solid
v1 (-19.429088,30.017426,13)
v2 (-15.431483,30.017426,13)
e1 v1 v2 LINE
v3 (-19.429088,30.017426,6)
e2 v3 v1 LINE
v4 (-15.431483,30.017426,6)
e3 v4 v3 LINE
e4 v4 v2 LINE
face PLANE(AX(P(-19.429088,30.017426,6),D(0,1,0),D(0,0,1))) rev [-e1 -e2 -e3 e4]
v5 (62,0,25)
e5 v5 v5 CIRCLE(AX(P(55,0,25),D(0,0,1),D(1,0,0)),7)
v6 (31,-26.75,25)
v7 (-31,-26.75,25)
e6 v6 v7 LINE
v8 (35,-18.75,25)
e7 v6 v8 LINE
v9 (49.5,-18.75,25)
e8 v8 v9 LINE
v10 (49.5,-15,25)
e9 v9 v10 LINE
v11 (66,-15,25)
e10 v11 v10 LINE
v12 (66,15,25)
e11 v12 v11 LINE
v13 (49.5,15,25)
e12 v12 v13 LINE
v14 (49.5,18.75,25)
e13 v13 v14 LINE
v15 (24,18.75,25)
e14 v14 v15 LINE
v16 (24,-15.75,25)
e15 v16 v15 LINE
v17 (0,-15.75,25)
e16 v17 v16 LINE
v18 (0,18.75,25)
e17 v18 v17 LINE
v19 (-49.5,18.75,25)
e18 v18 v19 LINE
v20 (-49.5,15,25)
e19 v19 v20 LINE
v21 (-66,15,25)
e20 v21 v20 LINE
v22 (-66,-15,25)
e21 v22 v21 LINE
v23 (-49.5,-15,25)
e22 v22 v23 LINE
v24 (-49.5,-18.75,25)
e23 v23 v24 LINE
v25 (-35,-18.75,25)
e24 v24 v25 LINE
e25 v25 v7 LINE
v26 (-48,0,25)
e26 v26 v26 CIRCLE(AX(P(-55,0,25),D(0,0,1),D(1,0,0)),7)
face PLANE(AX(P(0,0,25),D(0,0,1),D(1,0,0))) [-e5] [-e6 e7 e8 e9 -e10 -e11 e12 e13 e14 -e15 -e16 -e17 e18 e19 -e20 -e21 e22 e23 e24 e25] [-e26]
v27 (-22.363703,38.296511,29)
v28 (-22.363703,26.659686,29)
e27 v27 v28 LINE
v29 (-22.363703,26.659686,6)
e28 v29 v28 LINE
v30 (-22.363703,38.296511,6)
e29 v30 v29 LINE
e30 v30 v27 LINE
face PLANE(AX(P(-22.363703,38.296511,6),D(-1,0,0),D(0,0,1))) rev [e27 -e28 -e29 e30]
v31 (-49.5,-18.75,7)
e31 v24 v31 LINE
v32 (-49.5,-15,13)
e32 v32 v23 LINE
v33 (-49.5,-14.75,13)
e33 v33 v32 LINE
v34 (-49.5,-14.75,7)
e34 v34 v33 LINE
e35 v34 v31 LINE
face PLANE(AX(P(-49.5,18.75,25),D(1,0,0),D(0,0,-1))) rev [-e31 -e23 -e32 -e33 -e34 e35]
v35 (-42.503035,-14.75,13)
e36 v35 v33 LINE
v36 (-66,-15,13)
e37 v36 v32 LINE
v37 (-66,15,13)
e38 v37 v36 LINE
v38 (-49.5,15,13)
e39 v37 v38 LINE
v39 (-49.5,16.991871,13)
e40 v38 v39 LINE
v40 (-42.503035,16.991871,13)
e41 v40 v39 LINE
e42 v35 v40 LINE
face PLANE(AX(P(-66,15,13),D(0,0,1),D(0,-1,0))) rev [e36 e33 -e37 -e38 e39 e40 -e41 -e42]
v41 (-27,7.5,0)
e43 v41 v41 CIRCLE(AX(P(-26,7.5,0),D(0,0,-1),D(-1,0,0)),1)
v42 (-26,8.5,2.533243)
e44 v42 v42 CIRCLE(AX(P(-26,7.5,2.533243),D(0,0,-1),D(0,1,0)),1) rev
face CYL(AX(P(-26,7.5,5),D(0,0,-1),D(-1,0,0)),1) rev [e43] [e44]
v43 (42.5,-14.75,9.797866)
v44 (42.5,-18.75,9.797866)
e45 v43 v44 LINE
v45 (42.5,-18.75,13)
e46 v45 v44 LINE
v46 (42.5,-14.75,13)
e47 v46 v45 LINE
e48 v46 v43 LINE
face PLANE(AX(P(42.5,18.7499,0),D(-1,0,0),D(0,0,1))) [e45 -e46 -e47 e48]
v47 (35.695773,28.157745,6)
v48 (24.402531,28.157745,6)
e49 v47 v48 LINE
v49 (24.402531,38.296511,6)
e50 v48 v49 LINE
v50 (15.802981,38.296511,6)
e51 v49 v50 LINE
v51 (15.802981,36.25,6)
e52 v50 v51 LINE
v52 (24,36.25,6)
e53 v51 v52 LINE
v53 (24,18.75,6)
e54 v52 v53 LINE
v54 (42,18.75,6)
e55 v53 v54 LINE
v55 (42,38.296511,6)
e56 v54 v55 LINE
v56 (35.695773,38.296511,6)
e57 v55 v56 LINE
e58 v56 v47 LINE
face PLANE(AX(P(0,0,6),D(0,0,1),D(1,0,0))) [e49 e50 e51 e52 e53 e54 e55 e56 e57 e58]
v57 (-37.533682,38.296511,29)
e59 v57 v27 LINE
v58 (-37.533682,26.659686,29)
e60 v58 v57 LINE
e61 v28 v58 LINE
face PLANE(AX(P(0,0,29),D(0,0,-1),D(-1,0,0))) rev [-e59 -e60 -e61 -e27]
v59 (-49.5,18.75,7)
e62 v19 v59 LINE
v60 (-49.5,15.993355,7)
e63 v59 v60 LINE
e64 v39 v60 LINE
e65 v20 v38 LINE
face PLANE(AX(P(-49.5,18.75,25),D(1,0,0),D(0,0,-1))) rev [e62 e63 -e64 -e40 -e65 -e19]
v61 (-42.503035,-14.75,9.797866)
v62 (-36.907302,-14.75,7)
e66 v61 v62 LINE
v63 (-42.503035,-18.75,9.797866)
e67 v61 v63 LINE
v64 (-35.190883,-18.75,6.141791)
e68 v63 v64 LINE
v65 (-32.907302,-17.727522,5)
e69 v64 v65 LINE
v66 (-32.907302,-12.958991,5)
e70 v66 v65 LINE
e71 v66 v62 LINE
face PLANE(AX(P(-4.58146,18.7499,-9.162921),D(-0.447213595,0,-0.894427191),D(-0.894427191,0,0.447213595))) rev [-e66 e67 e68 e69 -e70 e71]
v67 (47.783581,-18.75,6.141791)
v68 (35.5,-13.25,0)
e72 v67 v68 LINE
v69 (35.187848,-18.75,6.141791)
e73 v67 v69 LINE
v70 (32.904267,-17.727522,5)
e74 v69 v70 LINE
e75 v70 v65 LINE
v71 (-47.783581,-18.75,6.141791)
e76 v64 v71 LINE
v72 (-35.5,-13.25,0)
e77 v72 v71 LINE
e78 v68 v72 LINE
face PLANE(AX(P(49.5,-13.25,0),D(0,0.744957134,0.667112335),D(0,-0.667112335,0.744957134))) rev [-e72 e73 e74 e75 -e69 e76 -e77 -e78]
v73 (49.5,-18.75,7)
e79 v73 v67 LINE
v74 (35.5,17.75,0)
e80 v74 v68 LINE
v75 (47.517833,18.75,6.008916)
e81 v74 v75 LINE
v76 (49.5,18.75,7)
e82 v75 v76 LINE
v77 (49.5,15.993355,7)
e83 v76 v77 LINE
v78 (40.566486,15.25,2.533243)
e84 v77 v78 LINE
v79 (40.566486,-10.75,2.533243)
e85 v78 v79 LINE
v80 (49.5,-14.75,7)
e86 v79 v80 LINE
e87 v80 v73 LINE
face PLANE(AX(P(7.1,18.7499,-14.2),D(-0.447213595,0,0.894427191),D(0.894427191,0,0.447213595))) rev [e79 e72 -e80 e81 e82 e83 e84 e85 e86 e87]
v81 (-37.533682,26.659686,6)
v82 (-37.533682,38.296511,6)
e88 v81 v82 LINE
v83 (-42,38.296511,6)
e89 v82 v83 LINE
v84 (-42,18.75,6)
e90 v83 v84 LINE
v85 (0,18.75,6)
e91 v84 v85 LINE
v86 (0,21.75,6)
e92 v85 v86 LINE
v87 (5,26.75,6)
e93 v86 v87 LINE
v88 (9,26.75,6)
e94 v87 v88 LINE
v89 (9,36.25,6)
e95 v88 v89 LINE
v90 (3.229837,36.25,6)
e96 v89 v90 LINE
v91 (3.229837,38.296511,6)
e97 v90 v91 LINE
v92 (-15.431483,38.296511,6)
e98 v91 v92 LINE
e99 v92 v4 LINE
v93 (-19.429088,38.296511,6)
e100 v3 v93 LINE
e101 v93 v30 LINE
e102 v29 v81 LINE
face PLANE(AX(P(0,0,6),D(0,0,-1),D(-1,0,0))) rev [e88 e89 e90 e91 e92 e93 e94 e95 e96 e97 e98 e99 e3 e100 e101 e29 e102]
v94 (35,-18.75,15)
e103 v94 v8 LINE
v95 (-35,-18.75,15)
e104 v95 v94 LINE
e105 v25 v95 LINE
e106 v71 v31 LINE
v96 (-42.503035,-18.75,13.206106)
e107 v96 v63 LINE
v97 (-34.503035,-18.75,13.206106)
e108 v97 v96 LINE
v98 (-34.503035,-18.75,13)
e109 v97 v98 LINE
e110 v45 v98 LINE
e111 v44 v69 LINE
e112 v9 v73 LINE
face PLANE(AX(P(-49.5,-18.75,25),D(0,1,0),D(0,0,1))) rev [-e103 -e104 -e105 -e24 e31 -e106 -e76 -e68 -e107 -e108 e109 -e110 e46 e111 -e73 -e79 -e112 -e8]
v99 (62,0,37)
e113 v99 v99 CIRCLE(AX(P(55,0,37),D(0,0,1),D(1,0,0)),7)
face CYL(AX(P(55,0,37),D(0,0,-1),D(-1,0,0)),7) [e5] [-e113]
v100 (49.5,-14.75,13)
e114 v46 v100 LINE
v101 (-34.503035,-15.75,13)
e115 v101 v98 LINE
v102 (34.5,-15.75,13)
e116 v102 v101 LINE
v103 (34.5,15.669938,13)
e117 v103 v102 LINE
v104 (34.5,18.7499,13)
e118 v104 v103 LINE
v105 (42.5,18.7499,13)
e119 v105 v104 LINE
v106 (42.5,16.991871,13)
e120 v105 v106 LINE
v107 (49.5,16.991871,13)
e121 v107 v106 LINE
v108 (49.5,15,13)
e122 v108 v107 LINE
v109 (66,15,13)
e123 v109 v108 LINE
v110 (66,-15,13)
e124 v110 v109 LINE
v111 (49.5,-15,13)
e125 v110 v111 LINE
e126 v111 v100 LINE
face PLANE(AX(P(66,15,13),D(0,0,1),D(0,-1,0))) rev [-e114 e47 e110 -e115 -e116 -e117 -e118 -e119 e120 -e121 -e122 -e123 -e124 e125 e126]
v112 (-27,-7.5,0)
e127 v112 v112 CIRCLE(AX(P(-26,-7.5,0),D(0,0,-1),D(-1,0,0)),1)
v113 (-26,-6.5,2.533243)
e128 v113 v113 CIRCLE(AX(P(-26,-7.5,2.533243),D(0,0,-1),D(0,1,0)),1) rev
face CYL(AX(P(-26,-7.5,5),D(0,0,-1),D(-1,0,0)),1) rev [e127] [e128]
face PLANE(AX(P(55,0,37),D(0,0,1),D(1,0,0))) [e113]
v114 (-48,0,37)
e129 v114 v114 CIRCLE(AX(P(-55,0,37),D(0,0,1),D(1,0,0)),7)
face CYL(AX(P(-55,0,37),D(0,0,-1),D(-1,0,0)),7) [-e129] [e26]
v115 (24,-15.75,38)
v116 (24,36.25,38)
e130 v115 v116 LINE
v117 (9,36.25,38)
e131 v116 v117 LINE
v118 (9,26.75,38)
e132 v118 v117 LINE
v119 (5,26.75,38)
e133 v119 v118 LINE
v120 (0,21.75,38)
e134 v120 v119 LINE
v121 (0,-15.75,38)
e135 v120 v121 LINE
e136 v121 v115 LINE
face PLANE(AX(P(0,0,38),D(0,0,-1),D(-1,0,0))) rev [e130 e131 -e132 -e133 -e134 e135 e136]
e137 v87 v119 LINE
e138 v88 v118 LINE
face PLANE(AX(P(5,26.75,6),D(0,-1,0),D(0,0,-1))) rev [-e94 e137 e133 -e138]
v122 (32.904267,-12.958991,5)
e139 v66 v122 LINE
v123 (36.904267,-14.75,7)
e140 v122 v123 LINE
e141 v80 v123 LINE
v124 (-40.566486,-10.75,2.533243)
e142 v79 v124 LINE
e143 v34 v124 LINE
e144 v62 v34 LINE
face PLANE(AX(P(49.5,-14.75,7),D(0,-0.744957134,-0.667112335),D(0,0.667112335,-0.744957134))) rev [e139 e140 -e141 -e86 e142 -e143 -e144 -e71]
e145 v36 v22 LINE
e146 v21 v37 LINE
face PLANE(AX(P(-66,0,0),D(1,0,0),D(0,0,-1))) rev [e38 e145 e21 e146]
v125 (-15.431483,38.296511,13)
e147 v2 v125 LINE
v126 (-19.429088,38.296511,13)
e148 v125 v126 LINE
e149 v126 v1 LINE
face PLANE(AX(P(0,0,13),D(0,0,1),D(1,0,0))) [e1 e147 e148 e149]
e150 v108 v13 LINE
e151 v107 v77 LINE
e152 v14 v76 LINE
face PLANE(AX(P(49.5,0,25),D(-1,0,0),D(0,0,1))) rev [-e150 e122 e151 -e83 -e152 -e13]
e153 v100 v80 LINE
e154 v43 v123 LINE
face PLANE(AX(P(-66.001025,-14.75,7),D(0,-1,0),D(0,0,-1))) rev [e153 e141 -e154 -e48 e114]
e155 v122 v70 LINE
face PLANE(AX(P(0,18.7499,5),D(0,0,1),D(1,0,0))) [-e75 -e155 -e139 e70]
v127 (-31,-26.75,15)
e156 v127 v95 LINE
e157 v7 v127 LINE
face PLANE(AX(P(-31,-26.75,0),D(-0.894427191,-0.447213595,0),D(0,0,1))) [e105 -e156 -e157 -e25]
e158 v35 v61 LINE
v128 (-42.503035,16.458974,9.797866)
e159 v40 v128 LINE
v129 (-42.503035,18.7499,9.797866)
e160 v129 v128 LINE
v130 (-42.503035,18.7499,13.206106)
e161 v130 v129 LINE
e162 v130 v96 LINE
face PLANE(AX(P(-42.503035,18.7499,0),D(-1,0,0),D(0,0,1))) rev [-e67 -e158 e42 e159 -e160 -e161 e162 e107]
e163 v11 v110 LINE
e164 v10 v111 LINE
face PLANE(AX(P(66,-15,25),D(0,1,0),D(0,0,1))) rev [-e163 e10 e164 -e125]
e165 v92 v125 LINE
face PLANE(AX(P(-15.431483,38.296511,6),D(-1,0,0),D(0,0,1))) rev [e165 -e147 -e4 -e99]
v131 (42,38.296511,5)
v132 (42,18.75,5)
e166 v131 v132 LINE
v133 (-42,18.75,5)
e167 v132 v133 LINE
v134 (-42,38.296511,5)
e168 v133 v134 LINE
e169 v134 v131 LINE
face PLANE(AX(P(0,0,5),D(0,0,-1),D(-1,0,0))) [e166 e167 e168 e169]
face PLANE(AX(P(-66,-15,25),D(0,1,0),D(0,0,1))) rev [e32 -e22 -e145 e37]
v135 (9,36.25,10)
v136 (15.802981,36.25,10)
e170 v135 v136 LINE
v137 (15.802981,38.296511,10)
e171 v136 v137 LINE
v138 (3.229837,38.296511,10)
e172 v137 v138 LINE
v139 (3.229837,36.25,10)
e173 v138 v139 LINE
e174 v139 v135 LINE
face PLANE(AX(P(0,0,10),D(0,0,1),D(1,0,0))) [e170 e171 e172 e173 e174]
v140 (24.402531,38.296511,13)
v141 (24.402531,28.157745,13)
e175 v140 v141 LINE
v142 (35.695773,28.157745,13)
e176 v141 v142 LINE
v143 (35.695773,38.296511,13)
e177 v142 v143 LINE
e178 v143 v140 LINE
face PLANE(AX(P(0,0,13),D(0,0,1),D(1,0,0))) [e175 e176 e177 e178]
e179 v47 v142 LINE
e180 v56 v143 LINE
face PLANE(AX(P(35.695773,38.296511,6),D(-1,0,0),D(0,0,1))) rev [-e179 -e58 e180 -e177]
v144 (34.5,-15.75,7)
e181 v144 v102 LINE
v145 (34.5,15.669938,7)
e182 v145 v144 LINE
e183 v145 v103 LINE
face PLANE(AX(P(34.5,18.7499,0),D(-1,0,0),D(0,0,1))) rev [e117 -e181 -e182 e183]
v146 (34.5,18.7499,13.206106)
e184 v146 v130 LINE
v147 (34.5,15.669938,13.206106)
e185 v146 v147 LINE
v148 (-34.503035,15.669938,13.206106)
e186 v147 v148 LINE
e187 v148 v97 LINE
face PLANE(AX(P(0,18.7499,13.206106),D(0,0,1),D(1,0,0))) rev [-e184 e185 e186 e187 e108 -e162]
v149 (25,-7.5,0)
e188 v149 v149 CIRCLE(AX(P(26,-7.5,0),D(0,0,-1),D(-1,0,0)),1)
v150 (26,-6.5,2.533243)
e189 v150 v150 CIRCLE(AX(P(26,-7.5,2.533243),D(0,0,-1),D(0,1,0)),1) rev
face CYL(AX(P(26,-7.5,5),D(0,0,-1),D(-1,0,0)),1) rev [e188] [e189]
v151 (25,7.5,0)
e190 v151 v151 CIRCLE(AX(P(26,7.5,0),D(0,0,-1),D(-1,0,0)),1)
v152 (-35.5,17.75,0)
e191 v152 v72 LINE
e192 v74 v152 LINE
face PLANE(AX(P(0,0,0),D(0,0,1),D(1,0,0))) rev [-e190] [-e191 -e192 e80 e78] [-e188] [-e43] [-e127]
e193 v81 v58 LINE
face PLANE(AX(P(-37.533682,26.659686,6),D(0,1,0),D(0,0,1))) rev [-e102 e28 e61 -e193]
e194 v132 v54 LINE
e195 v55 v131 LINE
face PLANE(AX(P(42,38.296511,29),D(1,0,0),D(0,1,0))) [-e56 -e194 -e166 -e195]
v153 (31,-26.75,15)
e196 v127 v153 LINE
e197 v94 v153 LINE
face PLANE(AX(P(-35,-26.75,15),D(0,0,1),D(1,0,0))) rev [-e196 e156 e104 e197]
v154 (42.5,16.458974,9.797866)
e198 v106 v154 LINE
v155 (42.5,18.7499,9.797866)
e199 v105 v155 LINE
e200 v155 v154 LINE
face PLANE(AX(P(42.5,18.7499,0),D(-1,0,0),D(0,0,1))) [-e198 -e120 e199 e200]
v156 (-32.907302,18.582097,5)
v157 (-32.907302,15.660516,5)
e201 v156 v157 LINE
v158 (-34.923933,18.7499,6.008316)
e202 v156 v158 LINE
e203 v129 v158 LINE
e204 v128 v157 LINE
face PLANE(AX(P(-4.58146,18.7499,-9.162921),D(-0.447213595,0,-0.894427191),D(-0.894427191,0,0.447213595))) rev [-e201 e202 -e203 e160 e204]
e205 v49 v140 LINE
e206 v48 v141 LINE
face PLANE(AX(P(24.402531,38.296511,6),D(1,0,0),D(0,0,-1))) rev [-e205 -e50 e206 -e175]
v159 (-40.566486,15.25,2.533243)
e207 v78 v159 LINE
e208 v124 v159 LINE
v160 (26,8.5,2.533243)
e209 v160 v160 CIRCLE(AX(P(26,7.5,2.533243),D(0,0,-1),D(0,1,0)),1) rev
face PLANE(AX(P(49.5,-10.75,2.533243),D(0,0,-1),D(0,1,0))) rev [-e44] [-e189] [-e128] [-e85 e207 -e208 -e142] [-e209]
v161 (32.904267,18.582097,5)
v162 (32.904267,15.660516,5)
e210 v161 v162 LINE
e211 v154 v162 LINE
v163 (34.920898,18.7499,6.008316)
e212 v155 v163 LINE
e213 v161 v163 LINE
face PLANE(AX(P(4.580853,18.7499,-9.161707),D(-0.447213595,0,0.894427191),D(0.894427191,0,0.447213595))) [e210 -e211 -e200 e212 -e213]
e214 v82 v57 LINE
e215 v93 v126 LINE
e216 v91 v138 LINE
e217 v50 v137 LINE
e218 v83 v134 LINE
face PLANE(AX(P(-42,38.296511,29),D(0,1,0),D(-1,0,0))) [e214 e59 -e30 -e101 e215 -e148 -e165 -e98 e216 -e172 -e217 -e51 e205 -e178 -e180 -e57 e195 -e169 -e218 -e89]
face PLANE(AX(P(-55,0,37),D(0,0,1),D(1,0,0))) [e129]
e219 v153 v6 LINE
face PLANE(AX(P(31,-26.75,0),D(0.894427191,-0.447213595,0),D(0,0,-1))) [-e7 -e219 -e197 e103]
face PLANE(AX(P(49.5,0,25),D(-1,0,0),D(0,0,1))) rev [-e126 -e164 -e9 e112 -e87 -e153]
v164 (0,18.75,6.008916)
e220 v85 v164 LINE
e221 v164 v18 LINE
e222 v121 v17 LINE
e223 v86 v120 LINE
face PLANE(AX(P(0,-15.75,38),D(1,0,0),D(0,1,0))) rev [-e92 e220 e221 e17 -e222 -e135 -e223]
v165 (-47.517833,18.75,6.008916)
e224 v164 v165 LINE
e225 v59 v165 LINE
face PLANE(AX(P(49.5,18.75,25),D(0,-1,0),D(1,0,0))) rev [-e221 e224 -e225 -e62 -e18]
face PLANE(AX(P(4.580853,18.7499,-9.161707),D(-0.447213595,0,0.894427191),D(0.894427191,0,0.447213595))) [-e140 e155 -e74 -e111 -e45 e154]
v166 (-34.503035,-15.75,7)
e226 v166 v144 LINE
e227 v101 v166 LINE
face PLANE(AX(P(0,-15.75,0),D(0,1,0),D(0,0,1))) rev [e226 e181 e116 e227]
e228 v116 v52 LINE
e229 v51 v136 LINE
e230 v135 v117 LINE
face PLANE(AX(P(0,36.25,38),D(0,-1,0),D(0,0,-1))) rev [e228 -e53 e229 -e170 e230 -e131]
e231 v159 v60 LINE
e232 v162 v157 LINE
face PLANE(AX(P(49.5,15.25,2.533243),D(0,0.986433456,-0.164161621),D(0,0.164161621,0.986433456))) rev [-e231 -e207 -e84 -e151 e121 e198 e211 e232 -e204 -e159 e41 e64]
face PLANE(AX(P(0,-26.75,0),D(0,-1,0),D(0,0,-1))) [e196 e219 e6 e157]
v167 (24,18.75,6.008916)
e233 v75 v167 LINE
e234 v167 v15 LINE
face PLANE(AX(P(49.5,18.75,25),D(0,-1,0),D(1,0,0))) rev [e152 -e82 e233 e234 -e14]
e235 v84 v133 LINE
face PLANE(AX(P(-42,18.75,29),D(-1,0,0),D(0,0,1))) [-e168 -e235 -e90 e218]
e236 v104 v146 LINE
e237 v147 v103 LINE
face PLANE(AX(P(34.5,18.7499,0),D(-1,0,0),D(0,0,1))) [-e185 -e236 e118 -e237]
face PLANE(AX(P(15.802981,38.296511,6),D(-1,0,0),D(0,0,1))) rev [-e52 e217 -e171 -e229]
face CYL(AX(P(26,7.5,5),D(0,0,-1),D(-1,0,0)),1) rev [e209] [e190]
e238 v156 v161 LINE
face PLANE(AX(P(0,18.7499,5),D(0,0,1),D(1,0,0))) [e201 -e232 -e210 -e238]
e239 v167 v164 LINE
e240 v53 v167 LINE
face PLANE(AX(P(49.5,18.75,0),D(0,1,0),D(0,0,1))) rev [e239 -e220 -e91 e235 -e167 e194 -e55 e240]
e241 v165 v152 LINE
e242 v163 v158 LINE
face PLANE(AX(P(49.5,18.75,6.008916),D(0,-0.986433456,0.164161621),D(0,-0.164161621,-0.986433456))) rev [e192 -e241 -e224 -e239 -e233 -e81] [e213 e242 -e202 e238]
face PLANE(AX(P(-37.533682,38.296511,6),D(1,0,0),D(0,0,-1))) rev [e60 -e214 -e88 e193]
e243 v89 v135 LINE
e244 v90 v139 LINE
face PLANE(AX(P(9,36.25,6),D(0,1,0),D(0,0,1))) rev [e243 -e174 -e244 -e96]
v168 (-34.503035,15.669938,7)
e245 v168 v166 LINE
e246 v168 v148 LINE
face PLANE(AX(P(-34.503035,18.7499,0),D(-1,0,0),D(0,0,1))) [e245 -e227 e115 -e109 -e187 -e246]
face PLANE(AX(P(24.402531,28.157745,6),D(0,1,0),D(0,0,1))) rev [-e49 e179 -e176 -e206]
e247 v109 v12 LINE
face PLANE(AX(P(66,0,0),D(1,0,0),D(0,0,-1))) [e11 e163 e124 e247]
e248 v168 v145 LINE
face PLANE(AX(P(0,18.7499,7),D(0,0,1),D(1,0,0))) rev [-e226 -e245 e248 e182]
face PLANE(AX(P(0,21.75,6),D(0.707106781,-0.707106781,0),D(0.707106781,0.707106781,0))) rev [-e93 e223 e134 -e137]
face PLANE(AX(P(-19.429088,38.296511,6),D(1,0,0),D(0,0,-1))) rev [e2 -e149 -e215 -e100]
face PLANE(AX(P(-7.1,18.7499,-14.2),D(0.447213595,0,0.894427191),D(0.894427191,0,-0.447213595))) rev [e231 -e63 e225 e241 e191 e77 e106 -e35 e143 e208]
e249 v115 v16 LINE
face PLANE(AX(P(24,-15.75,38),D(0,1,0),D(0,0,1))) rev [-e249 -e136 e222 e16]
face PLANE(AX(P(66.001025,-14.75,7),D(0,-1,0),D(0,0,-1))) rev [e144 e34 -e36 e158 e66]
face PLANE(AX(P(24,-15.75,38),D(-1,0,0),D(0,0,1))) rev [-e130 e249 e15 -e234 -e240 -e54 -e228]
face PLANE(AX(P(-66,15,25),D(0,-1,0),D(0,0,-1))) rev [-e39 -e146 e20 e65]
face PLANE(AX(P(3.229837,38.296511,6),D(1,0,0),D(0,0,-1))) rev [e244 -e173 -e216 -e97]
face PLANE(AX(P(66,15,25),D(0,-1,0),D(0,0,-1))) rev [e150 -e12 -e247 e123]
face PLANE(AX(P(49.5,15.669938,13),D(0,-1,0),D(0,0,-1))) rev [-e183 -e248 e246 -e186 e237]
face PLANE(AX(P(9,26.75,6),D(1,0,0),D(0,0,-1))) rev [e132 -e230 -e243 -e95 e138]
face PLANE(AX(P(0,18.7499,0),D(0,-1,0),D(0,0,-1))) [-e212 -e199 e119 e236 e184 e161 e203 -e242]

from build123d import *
from OCP.BRepFilletAPI import BRepFilletAPI_MakeChamfer

# Parameters (mm, degrees)
BOSS_EXTRUDE1_DEPTH = 25
SKETCH2_W           = 84
SKETCH2_H           = 19.546511152
BOSS_EXTRUDE2_DEPTH = 24
SKETCH3_W           = 12
SKETCH3_H           = 30
BOSS_EXTRUDE3_DEPTH = 16.5
SKETCH4_W           = 12
SKETCH4_H           = 30
BOSS_EXTRUDE4_DEPTH = 16.5
SKETCH5_W           = 24
SKETCH5_H           = 52
BOSS_EXTRUDE5_DEPTH = 13
SKETCH9_W           = 70
SKETCH9_H           = 10
BOSS_EXTRUDE6_DEPTH = 8
CHAMFER1_SIZE       = 8
CHAMFER1_SIZE_2     = 4
SKETCH10_R          = 7
BOSS_EXTRUDE7_DEPTH = 12
SKETCH11_R          = 1
CUT_EXTRUDE1_DEPTH  = 5
CUT_EXTRUDE24_DEPTH = 37.4999
CUT_EXTRUDE25_REACH = 90.714
CUT_EXTRUDE26_DEPTH = 99
CUT_EXTRUDE27_REACH = 129.479
CUT_EXTRUDE28_DEPTH = 69.00303493
CUT_EXTRUDE29_REACH = 129.479
SKETCH19_W          = 69.00303493
SKETCH19_H          = 6
CUT_EXTRUDE30_DEPTH = 3
CUT_EXTRUDE32_DEPTH = 23
SKETCH21_W          = 3.997604332
SKETCH21_H          = 8.279085248
SKETCH21_W_2        = 11.293242608
SKETCH21_H_2        = 10.138766403
CUT_EXTRUDE33_DEPTH = 16
SKETCH22_W          = 12.573143588
SKETCH22_H          = 2.046511152
CUT_EXTRUDE34_DEPTH = 19
CUT_EXTRUDE35_DEPTH = 32


with BuildPart() as part:
    # Sketch1 → Boss-Extrude1 (new body)
    with BuildSketch(Plane.XY):
        Polygon((49.5, 0), (49.5, 18.75), (-49.5, 18.75), (-49.5, -18.75), (49.5, -18.75), align=None)
    extrude(amount=BOSS_EXTRUDE1_DEPTH)

    # Sketch2 → Boss-Extrude2 (add)
    with BuildSketch(Plane(origin=(0, 0, 5), x_dir=(-1, 0, 0), z_dir=(0, 0, -1))):
        with Locations((0, 28.523255576)):
            Rectangle(SKETCH2_W, SKETCH2_H)
    extrude(amount=-BOSS_EXTRUDE2_DEPTH)

    # Sketch3 → Boss-Extrude3 (add)
    with BuildSketch(Plane(origin=(49.5, 0, 0), x_dir=(0, 0, -1), z_dir=(1, 0, 0))):
        with Locations((-19, 0)):
            Rectangle(SKETCH3_W, SKETCH3_H)
    extrude(amount=BOSS_EXTRUDE3_DEPTH)

    # Sketch4 → Boss-Extrude4 (add)
    with BuildSketch(Plane.ZY.offset(49.5)):
        with Locations((19, 0)):
            Rectangle(SKETCH4_W, SKETCH4_H)
    extrude(amount=BOSS_EXTRUDE4_DEPTH)

    # Sketch5 → Boss-Extrude5 (add)
    with BuildSketch(Plane.XY.offset(25)):
        with Locations((12, 10.25)):
            Rectangle(SKETCH5_W, SKETCH5_H)
    extrude(amount=BOSS_EXTRUDE5_DEPTH)

    # Sketch9 → Boss-Extrude6 (add)
    with BuildSketch(Plane.XZ.offset(18.75)):
        with Locations((0, 20)):
            Rectangle(SKETCH9_W, SKETCH9_H)
    extrude(amount=BOSS_EXTRUDE6_DEPTH)

    # Chamfer1
    chamfer1_edges_1 = [part.edges().sort_by_distance(p)[0] for p in [
        (-35, -26.75, 20),
    ]]
    chamfer1_side_1 = [part.faces().sort_by_distance(p)[0] for p in [
        (-35, -26.67, 20),
    ]]
    chamfer1_edges_2 = [part.edges().sort_by_distance(p)[0] for p in [
        (35, -26.75, 20),
    ]]
    chamfer1_side_2 = [part.faces().sort_by_distance(p)[0] for p in [
        (35, -26.67, 20),
    ]]
    chamfer1 = BRepFilletAPI_MakeChamfer(part.part.solid().wrapped)
    for e in chamfer1_edges_1:
        chamfer1.Add(CHAMFER1_SIZE - 0.0001, CHAMFER1_SIZE_2 - 0.0001, e.wrapped, chamfer1_side_1[0].wrapped)
    for e in chamfer1_edges_2:
        chamfer1.Add(CHAMFER1_SIZE - 0.0001, CHAMFER1_SIZE_2 - 0.0001, e.wrapped, chamfer1_side_2[0].wrapped)
    add(Compound.cast(chamfer1.Shape()), mode=Mode.REPLACE)  # a hair under: the kernel refuses the full size

    # Sketch10 → Boss-Extrude7 (add)
    with BuildSketch(Plane.XY.offset(25)):
        with Locations((-55, 0)):
            Circle(SKETCH10_R)
        with Locations((55, 0)):
            Circle(SKETCH10_R)
    extrude(amount=BOSS_EXTRUDE7_DEPTH)

    # Sketch11 → Cut-Extrude1 (cut)
    with BuildSketch(Plane(origin=(0, 0, 0), x_dir=(-1, 0, 0), z_dir=(0, 0, -1))):
        with Locations((-26, 7.5)):
            Circle(SKETCH11_R)
        with Locations((26, 7.5)):
            Circle(SKETCH11_R)
        with Locations((26, -7.5)):
            Circle(SKETCH11_R)
        with Locations((-26, -7.5)):
            Circle(SKETCH11_R)
    extrude(amount=-CUT_EXTRUDE1_DEPTH, mode=Mode.SUBTRACT)

    # Sketch12 → Cut-Extrude24 (cut)
    with BuildSketch(Plane.XZ.offset(18.75)):
        Polygon((49.5, 7), (35.5, 0), (49.5, 0), align=None)
        Polygon((-49.5, 0), (-49.5, 7), (-35.5, 0), align=None)
        Polygon((-42.50303493, 13.206106321), (-42.50303493, 9.79786642), (-32.90730209, 5), (32.904267164, 5), (42.5, 9.797866418), (42.5, 13), (34.5, 13), (34.5, 7), (-34.50303493, 7), (-34.50303493, 13.206106321), align=None)
    extrude(amount=-CUT_EXTRUDE24_DEPTH, mode=Mode.SUBTRACT)

    # Sketch13 → Cut-Extrude25 (cut, up to next)
    with BuildSketch(Plane.XZ.offset(-18.7499), mode=Mode.PRIVATE) as cut_extrude25_sk1:
        Polygon((49.5, 7), (49.5, 0), (35.5, 0), align=None)
    cut_extrude25_tool1 = extrude(cut_extrude25_sk1.sketch, amount=-CUT_EXTRUDE25_REACH, mode=Mode.PRIVATE) & part.part
    # Sketch13 → Cut-Extrude25 (cut, up to next)
    with BuildSketch(Plane.XZ.offset(-18.7499), mode=Mode.PRIVATE) as cut_extrude25_sk2:
        Polygon((-35.5, 0), (-49.5, 0), (-49.5, 7), align=None)
    cut_extrude25_tool2 = extrude(cut_extrude25_sk2.sketch, amount=-CUT_EXTRUDE25_REACH, mode=Mode.PRIVATE) & part.part
    add(cut_extrude25_tool1.solids().sort_by_distance((44.833333, 18.7499, 2.333333))[0], mode=Mode.SUBTRACT)
    add(cut_extrude25_tool2.solids().sort_by_distance((-44.833333, 18.7499, 2.333333))[0], mode=Mode.SUBTRACT)

    # Sketch14 → Cut-Extrude26 (cut)
    with BuildSketch(Plane.ZY.offset(49.5)):
        Polygon((13, 15.669938024), (7, 15.669938024), (7, -14.75), (2.533243234, -10.75), (2.533243234, 15.25), (13, 16.991870924), align=None)
        Polygon((0, 17.75), (0, 18.75), (6.008916401, 18.75), align=None)
        Polygon((0, -13.25), (6.141790553, -18.75), (0, -18.75), align=None)
    extrude(amount=-CUT_EXTRUDE26_DEPTH, mode=Mode.SUBTRACT)

    # Sketch15 → Cut-Extrude27 (cut, up to next)
    with BuildSketch(Plane.ZY.offset(49.5), mode=Mode.PRIVATE) as cut_extrude27_sk1:
        Polygon((7, -14.75), (13, -14.75), (13, 15), (13, 15.669938024), (7, 15.669938024), align=None)
    cut_extrude27_tool1 = extrude(cut_extrude27_sk1.sketch, amount=-CUT_EXTRUDE27_REACH, mode=Mode.PRIVATE) & part.part
    add(cut_extrude27_tool1.solids().sort_by_distance((-49.5, 0.459969, 10))[0], mode=Mode.SUBTRACT)

    # Sketch16 → Cut-Extrude28 (cut)
    with BuildSketch(Plane.ZY.offset(34.50303493)):
        Polygon((13, 15.669938024), (13.206106321, 15.669938024), (13.206106321, 18.7499), (7, 18.7499), (7, 15.993354786), (13, 16.991870924), align=None)
    extrude(amount=-CUT_EXTRUDE28_DEPTH, mode=Mode.SUBTRACT)

    # Sketch18 → Cut-Extrude29 (cut, up to next)
    with BuildSketch(Plane(origin=(49.5, 0, 0), x_dir=(0, 0, -1), z_dir=(1, 0, 0)), mode=Mode.PRIVATE) as cut_extrude29_sk1:
        Polygon((-13, 15.669938024), (-13, 15), (-13, -14.75), (-7, -14.75), (-7, 15.669938024), align=None)
    cut_extrude29_tool1 = extrude(cut_extrude29_sk1.sketch, amount=-CUT_EXTRUDE29_REACH, mode=Mode.PRIVATE) & part.part
    add(cut_extrude29_tool1.solids().sort_by_distance((49.5, 0.459969, 10))[0], mode=Mode.SUBTRACT)

    # Sketch19 → Cut-Extrude30 (cut)
    with BuildSketch(Plane.XZ.offset(18.75)):
        with Locations((-0.001517465, 10)):
            Rectangle(SKETCH19_W, SKETCH19_H)
    extrude(amount=-CUT_EXTRUDE30_DEPTH, mode=Mode.SUBTRACT)

    # Sketch20 → Cut-Extrude32 (cut)
    with BuildSketch(Plane.XY.offset(29)):
        Polygon((3.229837256, 36.25), (0, 36.25), (0, 18.75), (-42, 18.75), (-42, 38.296511152), (-37.533682083, 38.296511152), (-37.533682083, 26.659686261), (-22.363703257, 26.659686261), (-22.363703257, 38.296511152), (-19.429087816, 38.296511152), (-19.429087816, 30.017425904), (-15.431483484, 30.017425904), (-15.431483484, 38.296511152), (3.229837256, 38.296511152), align=None)
        Polygon((24.40253089, 38.296511152), (24.40253089, 28.157744749), (35.695773498, 28.157744749), (35.695773498, 38.296511152), (42, 38.296511152), (42, 18.75), (24, 18.75), (24, 36.25), (15.802980844, 36.25), (15.802980844, 38.296511152), align=None)
    extrude(amount=-CUT_EXTRUDE32_DEPTH, mode=Mode.SUBTRACT)

    # Sketch21 → Cut-Extrude33 (cut)
    with BuildSketch(Plane.XY.offset(29)):
        with Locations((-17.43028565, 34.156968528)):
            Rectangle(SKETCH21_W, SKETCH21_H)
        with Locations((30.049152194, 33.227127951)):
            Rectangle(SKETCH21_W_2, SKETCH21_H_2)
    extrude(amount=-CUT_EXTRUDE33_DEPTH, mode=Mode.SUBTRACT)

    # Sketch22 → Cut-Extrude34 (cut)
    with BuildSketch(Plane.XY.offset(29)):
        with Locations((9.51640905, 37.273255576)):
            Rectangle(SKETCH22_W, SKETCH22_H)
    extrude(amount=-CUT_EXTRUDE34_DEPTH, mode=Mode.SUBTRACT)

    # Sketch23 → Cut-Extrude35 (cut)
    with BuildSketch(Plane.XY.offset(38)):
        Polygon((0, 21.75), (5, 26.75), (9, 26.75), (9, 36.25), (0, 36.25), align=None)
    extrude(amount=-CUT_EXTRUDE35_DEPTH, mode=Mode.SUBTRACT)


solid = part.part
